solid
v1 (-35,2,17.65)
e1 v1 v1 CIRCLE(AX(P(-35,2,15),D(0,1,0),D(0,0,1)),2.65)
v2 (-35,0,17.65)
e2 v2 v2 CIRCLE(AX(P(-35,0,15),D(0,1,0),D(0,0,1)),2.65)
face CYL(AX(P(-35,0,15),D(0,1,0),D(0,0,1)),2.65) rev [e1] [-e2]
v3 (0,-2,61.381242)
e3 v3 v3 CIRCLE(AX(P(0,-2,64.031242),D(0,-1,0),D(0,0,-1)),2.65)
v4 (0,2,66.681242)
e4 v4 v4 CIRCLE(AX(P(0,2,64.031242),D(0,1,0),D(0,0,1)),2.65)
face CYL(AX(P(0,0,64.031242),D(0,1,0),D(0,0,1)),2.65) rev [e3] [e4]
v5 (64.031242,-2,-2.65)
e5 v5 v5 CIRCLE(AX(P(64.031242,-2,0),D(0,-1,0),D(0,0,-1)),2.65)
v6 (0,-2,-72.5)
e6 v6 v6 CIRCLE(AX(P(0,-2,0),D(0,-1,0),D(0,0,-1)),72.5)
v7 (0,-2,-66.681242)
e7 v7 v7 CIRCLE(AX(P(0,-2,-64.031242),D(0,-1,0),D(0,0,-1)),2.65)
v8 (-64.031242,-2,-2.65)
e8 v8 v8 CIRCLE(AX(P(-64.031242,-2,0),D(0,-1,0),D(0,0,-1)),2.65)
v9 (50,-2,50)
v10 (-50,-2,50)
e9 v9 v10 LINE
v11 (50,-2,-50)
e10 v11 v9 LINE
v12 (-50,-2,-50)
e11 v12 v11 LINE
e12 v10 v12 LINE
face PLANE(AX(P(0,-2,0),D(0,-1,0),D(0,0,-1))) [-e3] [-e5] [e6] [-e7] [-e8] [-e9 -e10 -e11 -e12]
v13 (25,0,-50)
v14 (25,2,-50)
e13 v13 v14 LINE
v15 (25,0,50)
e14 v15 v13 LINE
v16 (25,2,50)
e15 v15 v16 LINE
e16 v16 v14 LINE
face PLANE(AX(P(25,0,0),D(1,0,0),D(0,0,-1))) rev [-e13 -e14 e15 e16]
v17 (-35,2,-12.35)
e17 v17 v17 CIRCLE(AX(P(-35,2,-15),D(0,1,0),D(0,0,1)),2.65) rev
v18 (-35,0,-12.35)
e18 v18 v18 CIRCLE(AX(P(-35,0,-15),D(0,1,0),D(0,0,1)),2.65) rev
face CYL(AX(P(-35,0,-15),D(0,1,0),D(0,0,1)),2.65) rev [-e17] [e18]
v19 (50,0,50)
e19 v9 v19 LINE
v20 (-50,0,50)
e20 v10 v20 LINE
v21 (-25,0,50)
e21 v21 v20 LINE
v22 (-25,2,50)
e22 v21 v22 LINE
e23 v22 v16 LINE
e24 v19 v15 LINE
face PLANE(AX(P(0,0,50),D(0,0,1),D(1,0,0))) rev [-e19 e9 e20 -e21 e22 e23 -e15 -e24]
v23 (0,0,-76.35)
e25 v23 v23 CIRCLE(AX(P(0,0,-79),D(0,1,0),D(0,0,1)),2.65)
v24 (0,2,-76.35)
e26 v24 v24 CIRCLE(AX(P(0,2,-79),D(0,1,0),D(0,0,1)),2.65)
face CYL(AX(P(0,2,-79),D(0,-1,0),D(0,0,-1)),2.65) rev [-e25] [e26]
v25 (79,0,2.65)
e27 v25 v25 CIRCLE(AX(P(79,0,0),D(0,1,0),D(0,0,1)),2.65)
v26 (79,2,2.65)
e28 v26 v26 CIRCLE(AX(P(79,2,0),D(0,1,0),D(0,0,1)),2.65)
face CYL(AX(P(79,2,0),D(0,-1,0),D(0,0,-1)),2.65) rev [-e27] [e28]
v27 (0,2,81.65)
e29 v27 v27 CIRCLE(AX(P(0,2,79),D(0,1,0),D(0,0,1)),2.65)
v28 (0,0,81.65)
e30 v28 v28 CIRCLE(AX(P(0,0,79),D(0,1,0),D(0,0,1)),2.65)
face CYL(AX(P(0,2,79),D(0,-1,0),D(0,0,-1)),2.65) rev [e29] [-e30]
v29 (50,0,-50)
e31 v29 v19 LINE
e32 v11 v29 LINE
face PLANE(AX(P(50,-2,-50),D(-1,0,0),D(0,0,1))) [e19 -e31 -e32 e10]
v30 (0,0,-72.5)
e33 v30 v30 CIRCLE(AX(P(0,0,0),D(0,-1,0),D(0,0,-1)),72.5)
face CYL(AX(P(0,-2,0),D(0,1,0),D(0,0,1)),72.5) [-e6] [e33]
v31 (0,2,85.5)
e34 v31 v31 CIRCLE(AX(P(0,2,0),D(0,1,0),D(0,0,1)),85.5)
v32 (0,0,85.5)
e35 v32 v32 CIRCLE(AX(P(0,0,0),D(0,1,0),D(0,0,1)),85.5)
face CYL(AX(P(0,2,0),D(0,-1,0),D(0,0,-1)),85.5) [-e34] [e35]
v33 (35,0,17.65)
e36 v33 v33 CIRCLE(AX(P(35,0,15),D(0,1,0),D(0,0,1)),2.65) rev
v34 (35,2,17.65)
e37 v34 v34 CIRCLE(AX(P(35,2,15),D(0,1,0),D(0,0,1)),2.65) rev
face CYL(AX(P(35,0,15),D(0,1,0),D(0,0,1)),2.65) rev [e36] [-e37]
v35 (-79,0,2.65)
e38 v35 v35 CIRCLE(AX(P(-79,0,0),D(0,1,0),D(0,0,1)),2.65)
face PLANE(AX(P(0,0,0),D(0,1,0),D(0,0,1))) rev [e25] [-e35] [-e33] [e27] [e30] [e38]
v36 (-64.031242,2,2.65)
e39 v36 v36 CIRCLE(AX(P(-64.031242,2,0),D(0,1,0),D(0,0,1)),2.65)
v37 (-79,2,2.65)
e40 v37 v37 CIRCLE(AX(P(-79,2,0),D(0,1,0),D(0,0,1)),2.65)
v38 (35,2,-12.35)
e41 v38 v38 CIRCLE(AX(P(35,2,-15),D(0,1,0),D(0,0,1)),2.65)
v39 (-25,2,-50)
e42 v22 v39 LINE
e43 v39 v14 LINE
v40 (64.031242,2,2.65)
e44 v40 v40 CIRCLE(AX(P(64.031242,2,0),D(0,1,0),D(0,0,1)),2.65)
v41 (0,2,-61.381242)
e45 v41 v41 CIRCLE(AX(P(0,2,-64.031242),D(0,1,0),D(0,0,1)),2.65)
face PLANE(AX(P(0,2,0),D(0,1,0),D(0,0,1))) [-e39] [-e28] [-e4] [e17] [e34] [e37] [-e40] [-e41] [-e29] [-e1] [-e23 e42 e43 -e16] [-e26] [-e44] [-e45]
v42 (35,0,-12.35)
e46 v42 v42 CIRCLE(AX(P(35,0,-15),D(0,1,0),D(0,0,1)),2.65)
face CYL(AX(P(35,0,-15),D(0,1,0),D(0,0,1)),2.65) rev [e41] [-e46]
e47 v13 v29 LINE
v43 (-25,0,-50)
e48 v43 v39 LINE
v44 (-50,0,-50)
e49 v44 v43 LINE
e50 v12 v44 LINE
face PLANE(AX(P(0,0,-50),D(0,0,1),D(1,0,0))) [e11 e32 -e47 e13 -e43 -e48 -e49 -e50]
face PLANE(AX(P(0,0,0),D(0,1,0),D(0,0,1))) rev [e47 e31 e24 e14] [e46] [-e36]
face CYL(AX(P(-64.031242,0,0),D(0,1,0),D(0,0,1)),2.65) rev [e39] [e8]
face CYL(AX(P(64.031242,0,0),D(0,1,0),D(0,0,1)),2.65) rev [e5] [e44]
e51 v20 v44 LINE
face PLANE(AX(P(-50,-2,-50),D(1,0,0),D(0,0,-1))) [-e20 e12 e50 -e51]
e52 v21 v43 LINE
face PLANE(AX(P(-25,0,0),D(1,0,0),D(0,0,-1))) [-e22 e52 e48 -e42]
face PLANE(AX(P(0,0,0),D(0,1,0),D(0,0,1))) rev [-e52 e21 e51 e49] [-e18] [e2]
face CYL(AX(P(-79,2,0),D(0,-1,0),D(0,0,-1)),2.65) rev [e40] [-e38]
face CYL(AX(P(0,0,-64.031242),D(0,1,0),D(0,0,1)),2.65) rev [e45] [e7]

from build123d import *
from build123d.topology import SkipClean

# Parameters (mm, degrees)
SKETCH_1_R            = 85.5
SKETCH_1_R_2          = 2.65
EXTRUDE_1_DEPTH       = 2
SKETCH_2_W            = 40
SKETCH_2_H            = 100
CUT_EXTRUDE_2_DEPTH   = 2
SKETCH_4_R            = 2.65
CUT_EXTRUDE_3_DEPTH   = 2
SKETCH_5_W            = 15
SKETCH_5_H            = 100
EXTRUDE_2_DEPTH       = 2
SKETCH_7_R            = 2.65
CUT_EXTRUDE_4_DEPTH   = 2
EXTRUDE_4_OUTLINE_R   = 72.5
EXTRUDE_4_OUTLINE_R_2 = 2.65
EXTRUDE_4_OUTLINE_W   = 100
EXTRUDE_4_OUTLINE_H   = 100
EXTRUDE_4_DEPTH       = 2


# Read off the part's stored shape, not the designer's step: 凸台-拉伸4
with BuildPart() as part:
    # 草图1 → 凸台-拉伸1 (new body)
    with BuildSketch(Plane(origin=(0, 0, 0), x_dir=(1, 0, 0), z_dir=(0, 1, 0))):
        with Locations(Location((0, 0, 0), (0, 0, 270))):
            Circle(SKETCH_1_R)
        with Locations(Location((0, 79, 0), (0, 0, 270))):
            Circle(SKETCH_1_R_2, mode=Mode.SUBTRACT)
        with Locations(Location((79, 0, 0), (0, 0, 270))):
            Circle(SKETCH_1_R_2, mode=Mode.SUBTRACT)
        with Locations(Location((0, -79, 0), (0, 0, 270))):
            Circle(SKETCH_1_R_2, mode=Mode.SUBTRACT)
        with Locations(Location((-79, 0, 0), (0, 0, 270))):
            Circle(SKETCH_1_R_2, mode=Mode.SUBTRACT)
    extrude(amount=EXTRUDE_1_DEPTH)

    # 草图2 → 切除-拉伸2 (cut)
    with BuildSketch(Plane(origin=(0, 2, 0), x_dir=(1, 0, 0), z_dir=(0, 1, 0))):
        with Locations((-20, 0)):
            Rectangle(SKETCH_2_W, SKETCH_2_H)
        with Locations((20, 0)):
            Rectangle(SKETCH_2_W, SKETCH_2_H)
    extrude(amount=-CUT_EXTRUDE_2_DEPTH, mode=Mode.SUBTRACT)

    # 草图4 → 切除-拉伸3 (cut)
    with BuildSketch(Plane(origin=(0, 2, 0), x_dir=(1, 0, 0), z_dir=(0, 1, 0))):
        with Locations(Location((0, 64.031242374, 0), (0, 0, 270))):
            Circle(SKETCH_4_R)
        with Locations(Location((64.031242374, 0, 0), (0, 0, 270))):
            Circle(SKETCH_4_R)
        with Locations(Location((0, -64.031242374, 0), (0, 0, 270))):
            Circle(SKETCH_4_R)
        with Locations(Location((-64.031242374, 0, 0), (0, 0, 270))):
            Circle(SKETCH_4_R)
    extrude(amount=-CUT_EXTRUDE_3_DEPTH, mode=Mode.SUBTRACT)

    # 草图5 → 凸台-拉伸2 (add)
    with BuildSketch(Plane(origin=(0, 2, 0), x_dir=(1, 0, 0), z_dir=(0, 1, 0))):
        with Locations((-32.5, 0)):
            Rectangle(SKETCH_5_W, SKETCH_5_H)
        with Locations((32.5, 0)):
            Rectangle(SKETCH_5_W, SKETCH_5_H)
    extrude(amount=-EXTRUDE_2_DEPTH)

    # 草图7 → 切除-拉伸4 (cut)
    with BuildSketch(Plane(origin=(0, 2, 0), x_dir=(1, 0, 0), z_dir=(0, 1, 0))):
        with Locations(Location((35, 15, 0), (0, 0, 270))):
            Circle(SKETCH_7_R)
        with Locations(Location((35, -15, 0), (0, 0, 270))):
            Circle(SKETCH_7_R)
        with Locations(Location((-35, -15, 0), (0, 0, 270))):
            Circle(SKETCH_7_R)
        with Locations(Location((-35, 15, 0), (0, 0, 270))):
            Circle(SKETCH_7_R)
    extrude(amount=-CUT_EXTRUDE_4_DEPTH, mode=Mode.SUBTRACT)

    # 凸台-拉伸4 outline → 凸台-拉伸4 (add)
    with SkipClean():  # the faces are left unmerged after this step: merging them gives an invalid solid
        with BuildSketch(Plane.XZ):
            Circle(EXTRUDE_4_OUTLINE_R)
            with Locations((0, -64.031242374)):
                Circle(EXTRUDE_4_OUTLINE_R_2, mode=Mode.SUBTRACT)
            with Locations((-64.031242374, 0)):
                Circle(EXTRUDE_4_OUTLINE_R_2, mode=Mode.SUBTRACT)
            Rectangle(EXTRUDE_4_OUTLINE_W, EXTRUDE_4_OUTLINE_H, mode=Mode.SUBTRACT)
            with Locations((64.031242374, 0)):
                Circle(EXTRUDE_4_OUTLINE_R_2, mode=Mode.SUBTRACT)
            with Locations((0, 64.031242374)):
                Circle(EXTRUDE_4_OUTLINE_R_2, mode=Mode.SUBTRACT)
        extrude(amount=EXTRUDE_4_DEPTH)
    add(part.part.scale(1), mode=Mode.REPLACE)  # the faces are merged on a copy


solid = part.part
